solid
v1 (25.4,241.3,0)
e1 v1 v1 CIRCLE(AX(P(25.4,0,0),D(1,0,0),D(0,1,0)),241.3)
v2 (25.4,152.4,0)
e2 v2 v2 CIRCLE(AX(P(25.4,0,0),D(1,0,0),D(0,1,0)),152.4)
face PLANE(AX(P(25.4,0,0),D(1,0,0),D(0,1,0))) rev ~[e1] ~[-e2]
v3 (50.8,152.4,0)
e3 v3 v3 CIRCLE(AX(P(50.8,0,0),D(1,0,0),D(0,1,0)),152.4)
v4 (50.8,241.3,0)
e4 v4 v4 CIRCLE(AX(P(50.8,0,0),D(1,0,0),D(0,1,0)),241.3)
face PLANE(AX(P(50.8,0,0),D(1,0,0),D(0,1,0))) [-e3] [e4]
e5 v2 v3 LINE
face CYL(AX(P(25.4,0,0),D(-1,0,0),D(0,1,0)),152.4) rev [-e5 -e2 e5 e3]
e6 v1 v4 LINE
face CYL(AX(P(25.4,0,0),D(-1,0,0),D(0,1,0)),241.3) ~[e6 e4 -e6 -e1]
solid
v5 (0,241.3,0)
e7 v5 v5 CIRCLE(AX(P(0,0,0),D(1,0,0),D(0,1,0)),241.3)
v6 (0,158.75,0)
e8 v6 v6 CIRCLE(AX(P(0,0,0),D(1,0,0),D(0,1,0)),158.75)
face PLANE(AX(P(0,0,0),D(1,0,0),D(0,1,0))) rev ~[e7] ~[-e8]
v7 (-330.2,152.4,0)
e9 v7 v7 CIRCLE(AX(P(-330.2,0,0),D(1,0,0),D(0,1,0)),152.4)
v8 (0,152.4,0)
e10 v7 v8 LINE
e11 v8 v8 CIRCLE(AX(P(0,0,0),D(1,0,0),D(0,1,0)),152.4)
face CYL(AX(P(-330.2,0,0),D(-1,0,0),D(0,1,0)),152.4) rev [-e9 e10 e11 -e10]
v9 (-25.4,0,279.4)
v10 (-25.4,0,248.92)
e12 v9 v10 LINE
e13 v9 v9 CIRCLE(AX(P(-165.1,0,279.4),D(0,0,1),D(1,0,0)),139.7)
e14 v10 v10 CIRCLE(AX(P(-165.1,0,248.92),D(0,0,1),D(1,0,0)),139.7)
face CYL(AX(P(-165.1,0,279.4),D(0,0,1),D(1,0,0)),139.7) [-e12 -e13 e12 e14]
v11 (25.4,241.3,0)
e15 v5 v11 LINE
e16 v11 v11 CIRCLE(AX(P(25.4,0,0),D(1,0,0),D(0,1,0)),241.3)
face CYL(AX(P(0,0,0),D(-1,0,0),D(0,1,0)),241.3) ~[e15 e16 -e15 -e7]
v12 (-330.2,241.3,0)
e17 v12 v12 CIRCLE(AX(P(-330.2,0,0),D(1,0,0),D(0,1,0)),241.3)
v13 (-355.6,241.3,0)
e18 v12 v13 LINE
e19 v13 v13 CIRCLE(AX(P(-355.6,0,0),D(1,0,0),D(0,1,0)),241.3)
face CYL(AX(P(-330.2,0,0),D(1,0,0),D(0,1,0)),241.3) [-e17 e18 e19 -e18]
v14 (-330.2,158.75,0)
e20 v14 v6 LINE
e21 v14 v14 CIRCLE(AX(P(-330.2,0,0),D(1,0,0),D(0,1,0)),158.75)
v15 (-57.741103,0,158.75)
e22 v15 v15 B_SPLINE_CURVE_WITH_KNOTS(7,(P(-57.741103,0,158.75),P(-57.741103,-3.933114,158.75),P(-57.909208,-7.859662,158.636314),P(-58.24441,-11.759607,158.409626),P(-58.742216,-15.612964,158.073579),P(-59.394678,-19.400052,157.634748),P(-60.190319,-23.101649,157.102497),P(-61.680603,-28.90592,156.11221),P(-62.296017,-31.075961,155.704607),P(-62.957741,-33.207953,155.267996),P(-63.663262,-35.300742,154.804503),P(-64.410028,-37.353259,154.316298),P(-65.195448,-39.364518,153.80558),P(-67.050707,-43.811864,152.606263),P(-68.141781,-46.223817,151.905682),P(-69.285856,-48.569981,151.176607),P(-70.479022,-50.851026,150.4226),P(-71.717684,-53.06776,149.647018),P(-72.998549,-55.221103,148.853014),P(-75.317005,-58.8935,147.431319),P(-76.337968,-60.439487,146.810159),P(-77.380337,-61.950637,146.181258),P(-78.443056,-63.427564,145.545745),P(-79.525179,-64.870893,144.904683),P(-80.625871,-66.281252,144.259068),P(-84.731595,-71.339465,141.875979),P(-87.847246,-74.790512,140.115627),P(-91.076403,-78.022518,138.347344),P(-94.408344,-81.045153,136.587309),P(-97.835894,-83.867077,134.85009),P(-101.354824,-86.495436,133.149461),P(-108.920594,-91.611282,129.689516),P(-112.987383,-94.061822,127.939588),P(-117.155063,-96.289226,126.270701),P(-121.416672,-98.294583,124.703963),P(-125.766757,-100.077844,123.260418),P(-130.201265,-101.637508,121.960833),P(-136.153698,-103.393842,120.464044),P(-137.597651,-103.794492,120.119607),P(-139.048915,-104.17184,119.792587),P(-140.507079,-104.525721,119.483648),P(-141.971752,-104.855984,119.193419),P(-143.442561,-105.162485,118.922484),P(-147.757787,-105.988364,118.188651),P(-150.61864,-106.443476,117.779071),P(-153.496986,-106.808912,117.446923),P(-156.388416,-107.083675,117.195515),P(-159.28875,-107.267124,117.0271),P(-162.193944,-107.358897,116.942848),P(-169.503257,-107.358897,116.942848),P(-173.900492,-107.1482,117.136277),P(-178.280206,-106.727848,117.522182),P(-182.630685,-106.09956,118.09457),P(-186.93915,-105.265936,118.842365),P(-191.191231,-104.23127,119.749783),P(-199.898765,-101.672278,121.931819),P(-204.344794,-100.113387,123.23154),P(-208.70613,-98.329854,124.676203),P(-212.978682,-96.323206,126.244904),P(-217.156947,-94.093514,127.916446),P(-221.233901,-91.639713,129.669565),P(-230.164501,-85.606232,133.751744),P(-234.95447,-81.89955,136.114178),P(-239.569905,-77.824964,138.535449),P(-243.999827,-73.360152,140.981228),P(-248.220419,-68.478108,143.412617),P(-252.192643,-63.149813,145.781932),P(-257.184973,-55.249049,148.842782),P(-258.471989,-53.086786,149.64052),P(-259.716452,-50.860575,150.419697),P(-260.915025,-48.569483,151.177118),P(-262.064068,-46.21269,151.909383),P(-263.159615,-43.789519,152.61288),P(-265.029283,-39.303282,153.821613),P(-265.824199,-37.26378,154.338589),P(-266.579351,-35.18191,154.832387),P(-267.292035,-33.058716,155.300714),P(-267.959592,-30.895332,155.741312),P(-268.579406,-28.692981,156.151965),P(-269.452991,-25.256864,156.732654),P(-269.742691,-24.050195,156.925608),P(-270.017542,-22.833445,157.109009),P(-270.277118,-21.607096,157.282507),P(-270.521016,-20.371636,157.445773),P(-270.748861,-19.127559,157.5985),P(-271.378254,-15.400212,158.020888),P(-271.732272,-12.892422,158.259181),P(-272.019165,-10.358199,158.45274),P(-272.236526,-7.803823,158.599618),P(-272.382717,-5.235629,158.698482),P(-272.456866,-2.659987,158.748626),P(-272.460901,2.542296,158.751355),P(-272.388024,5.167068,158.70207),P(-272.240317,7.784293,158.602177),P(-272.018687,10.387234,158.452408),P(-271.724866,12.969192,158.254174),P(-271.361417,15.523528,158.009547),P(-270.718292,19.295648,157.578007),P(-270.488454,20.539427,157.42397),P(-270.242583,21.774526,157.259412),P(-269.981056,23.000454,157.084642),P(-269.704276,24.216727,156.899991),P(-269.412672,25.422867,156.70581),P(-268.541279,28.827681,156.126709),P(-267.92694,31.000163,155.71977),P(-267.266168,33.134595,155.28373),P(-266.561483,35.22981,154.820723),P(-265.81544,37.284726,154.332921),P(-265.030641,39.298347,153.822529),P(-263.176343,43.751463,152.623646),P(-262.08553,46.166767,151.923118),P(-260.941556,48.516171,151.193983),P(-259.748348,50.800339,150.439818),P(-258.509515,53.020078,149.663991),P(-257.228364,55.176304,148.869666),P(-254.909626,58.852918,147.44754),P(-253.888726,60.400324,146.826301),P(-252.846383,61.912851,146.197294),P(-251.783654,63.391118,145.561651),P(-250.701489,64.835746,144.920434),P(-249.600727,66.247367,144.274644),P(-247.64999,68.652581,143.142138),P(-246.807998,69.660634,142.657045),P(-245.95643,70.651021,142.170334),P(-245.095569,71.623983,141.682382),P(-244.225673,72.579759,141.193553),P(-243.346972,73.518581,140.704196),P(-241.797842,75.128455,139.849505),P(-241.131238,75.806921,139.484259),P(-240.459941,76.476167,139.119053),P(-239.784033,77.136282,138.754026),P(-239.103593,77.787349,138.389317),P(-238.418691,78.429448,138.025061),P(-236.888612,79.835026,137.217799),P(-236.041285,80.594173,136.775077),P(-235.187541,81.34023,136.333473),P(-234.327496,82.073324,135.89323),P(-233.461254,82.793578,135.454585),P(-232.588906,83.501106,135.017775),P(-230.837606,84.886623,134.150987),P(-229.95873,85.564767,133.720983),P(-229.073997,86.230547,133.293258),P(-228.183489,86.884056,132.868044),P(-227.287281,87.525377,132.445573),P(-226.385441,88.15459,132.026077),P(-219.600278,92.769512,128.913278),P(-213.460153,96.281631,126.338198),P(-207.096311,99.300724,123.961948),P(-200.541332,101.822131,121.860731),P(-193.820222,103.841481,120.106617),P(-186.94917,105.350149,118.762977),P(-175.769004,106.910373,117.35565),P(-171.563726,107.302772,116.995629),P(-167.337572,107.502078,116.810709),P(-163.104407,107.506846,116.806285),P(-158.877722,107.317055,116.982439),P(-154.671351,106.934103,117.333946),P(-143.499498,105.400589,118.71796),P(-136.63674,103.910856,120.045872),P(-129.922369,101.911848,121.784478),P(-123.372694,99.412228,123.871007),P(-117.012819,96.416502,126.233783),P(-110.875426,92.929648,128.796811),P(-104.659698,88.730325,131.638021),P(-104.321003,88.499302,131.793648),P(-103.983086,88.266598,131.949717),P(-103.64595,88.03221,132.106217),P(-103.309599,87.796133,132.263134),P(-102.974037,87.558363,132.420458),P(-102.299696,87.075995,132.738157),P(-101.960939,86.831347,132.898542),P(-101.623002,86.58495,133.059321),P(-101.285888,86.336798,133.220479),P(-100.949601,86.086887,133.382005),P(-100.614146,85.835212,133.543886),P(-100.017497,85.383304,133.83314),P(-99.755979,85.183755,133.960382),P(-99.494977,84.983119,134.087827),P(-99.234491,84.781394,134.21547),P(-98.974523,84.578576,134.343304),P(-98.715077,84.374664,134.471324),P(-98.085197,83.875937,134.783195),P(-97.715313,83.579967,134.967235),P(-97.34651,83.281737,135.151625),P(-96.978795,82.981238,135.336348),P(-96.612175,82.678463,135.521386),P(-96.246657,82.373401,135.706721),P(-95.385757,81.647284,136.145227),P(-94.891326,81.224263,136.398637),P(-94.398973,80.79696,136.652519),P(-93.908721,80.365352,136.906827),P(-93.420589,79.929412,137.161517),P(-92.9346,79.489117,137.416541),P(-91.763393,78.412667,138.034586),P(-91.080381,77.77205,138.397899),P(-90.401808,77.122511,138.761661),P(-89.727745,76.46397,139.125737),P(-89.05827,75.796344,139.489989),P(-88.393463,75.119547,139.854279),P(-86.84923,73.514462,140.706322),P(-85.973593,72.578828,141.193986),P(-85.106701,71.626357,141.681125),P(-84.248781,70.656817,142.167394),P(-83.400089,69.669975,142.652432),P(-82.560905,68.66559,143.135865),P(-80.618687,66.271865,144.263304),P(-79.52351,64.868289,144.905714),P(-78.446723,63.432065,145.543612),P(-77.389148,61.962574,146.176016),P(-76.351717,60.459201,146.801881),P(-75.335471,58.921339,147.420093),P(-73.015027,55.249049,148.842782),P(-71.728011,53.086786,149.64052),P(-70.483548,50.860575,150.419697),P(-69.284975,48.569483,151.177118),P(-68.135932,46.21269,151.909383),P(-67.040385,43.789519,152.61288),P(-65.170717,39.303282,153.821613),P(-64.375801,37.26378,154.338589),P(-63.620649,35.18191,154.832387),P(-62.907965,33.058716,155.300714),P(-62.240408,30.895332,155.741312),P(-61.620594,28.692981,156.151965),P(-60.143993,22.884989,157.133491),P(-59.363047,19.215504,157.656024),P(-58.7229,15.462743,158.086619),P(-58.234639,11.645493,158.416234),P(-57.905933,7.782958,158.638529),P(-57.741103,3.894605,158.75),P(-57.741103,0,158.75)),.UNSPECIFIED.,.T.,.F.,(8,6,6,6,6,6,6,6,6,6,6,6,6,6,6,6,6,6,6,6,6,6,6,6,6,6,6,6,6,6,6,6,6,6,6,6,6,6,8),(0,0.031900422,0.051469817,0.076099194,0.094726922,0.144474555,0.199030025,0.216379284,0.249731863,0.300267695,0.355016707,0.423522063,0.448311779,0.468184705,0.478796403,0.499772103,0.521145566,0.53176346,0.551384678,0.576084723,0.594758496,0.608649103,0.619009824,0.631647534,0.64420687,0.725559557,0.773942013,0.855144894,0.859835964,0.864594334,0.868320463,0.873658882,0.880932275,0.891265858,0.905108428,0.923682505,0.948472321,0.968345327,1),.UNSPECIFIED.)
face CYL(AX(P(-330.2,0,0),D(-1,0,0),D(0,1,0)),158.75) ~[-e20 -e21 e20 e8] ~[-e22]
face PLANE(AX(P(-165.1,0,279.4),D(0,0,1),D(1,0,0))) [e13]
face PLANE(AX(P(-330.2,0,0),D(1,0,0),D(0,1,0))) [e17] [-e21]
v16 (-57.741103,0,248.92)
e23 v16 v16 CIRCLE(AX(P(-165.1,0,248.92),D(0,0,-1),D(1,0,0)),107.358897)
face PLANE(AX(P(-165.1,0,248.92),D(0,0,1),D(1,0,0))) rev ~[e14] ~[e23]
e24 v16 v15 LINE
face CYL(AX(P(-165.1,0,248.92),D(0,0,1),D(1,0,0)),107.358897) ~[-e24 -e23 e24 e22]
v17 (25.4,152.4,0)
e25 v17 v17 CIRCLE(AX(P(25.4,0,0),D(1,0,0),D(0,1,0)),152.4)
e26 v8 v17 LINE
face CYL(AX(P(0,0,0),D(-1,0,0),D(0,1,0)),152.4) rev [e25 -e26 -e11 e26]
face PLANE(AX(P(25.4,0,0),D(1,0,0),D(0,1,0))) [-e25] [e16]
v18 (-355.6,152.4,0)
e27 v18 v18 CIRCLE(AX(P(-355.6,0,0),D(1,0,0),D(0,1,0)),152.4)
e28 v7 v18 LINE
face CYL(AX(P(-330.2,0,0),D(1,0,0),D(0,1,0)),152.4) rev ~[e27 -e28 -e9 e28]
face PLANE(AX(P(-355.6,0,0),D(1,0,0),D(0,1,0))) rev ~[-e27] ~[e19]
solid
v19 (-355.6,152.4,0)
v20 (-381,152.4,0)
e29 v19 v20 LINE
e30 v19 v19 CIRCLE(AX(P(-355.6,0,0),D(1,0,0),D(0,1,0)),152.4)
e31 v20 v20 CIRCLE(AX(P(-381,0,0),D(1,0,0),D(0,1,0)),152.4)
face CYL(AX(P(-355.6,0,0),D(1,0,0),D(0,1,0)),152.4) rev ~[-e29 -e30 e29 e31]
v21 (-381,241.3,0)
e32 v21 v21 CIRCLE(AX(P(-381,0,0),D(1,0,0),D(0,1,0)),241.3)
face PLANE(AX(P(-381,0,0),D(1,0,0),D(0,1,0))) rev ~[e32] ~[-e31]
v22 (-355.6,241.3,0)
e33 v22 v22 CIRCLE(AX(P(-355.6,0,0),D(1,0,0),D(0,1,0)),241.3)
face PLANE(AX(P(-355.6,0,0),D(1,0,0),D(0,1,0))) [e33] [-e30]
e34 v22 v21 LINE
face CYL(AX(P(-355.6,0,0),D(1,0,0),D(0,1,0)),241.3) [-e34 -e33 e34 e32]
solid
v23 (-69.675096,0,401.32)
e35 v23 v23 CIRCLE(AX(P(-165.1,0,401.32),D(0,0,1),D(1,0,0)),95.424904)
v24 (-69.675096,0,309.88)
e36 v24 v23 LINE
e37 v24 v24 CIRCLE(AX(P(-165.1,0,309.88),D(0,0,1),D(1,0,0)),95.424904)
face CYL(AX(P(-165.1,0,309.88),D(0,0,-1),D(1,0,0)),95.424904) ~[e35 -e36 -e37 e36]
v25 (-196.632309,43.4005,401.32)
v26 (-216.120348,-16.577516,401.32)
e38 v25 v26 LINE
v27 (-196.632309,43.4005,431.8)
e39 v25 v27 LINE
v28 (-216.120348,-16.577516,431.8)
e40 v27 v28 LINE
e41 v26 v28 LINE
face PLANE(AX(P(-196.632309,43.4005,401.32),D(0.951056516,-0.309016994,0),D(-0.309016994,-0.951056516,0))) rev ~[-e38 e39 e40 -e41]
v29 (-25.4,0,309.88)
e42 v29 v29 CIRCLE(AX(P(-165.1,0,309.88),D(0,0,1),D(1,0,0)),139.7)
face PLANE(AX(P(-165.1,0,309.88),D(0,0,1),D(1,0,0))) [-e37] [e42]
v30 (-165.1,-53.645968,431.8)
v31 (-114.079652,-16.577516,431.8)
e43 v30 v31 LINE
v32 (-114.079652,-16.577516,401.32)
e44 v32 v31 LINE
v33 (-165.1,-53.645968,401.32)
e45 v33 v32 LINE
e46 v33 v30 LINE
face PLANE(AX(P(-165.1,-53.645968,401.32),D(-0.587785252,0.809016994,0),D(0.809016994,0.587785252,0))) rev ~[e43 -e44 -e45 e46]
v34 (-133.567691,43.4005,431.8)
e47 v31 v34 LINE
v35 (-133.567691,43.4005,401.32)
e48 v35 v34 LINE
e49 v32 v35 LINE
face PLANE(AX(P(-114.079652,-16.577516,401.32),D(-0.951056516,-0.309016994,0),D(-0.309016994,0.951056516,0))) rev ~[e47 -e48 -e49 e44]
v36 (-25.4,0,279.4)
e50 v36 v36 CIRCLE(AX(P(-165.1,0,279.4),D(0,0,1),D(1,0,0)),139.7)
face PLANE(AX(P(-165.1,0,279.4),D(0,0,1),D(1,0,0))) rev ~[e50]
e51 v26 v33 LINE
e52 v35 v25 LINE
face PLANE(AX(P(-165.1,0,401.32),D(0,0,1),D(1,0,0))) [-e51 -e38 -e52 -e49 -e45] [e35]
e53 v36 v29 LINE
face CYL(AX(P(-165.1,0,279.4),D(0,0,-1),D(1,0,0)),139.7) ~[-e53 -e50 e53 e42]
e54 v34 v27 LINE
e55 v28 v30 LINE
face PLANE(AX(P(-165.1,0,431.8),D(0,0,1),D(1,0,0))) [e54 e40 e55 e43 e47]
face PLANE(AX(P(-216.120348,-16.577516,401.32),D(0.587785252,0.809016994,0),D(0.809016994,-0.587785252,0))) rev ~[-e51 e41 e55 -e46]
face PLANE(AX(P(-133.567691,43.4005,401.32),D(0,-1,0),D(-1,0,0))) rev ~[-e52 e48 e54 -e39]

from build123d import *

# Parameters (mm, degrees)
F0_R      = 241.3
F0_R_2    = 152.4
F1_DEPTH  = 25.4
F3_R      = 241.3
F3_R_2    = 152.4
F4_DEPTH  = 25.4
F6_DEPTH  = 25.4
F7_DEPTH  = 25.4
F9_R      = 158.75
F9_R_2    = 152.4
F10_DEPTH = 330.2
F12_R     = 139.7
F13_DEPTH = 30.48
F14_R     = 107.3588969204
F15_REACH = 793.8778161324
F16_DEPTH = 30.48
F17_R     = 95.4249040927
F18_DEPTH = 91.44
F20_DEPTH = 30.48


with BuildPart() as f1:
    # F0 (on Right) → F1 (new body)
    with BuildSketch(Plane.YZ):
        Circle(F0_R)
        Circle(F0_R_2, mode=Mode.SUBTRACT)
    extrude(amount=F1_DEPTH)


with BuildPart() as f4:
    # F3 (on offset) → F4 (new body)
    with BuildSketch(Plane.YZ.offset(-330.2)):
        Circle(F3_R)
        Circle(F3_R_2, mode=Mode.SUBTRACT)
    extrude(amount=-F4_DEPTH)


with BuildPart() as f6:
    # F6 (new): a face of the model
    f6_faces = [f4.part.faces().sort_by_distance(p)[0] for p in [
        (-355.6, -234.475005348, 0),
    ]]
    extrude(f6_faces, amount=F6_DEPTH)


with BuildPart() as f7:
    # F7 (new): a face of the model
    f7_faces = [f1.part.faces().sort_by_distance(p)[0] for p in [
        (25.4, -234.475005348, 0),
    ]]
    extrude(f7_faces, amount=F7_DEPTH)


with BuildPart() as f1_1:
    add(f1.part)

    add(f4.part)  # F10 merges F4
    # F9 (on face) → F10 (join, through all)
    with BuildSketch(Plane.YZ.offset(-330.2)):
        Circle(F9_R)
        Circle(F9_R_2, mode=Mode.SUBTRACT)
    extrude(amount=F10_DEPTH)



with BuildPart() as f13:
    # F12 (on offset) → F13 (new body)
    with BuildSketch(Plane.XY.offset(279.4)):
        with Locations((-165.1, 0)):
            Circle(F12_R)
    extrude(amount=-F13_DEPTH)


with BuildPart() as f1_2:
    add(f1_1.part)

    add(f13.part)  # F15 merges F13
    f15_end = f1_2.faces().sort_by_distance((-165.1, -158.75, 0))[0]
    # F14 (on face) → F15 (join, up to a face of the model that its end follows)
    with BuildSketch(Plane(origin=(0, 0, 248.92), x_dir=(1, 0, 0), z_dir=(0, 0, -1))):
        with Locations((-165.1, 0)):
            Circle(F14_R)
    f15_long = extrude(amount=F15_REACH, mode=Mode.PRIVATE)
    add(split(f15_long, bisect_by=f15_end, keep=Keep.ALL, mode=Mode.PRIVATE).solids().sort_by_distance((-165.1, 0, 248.92))[0])


with BuildPart() as f16:
    # F16 (new): a face of the model
    f16_faces = [f1_2.part.faces().sort_by_distance(p)[0] for p in [
        (-165.1, 0, 279.4),
    ]]
    extrude(f16_faces, amount=F16_DEPTH)

    # F17 (on face) → F18 (join)
    with BuildSketch(Plane.XY.offset(309.88)):
        with Locations((-165.1, 0)):
            Circle(F17_R)
    extrude(amount=F18_DEPTH)

    # F19 (on face) → F20 (join)
    with BuildSketch(Plane.XY.offset(401.32)):
        Polygon((-133.5676910353, 43.4004999697), (-196.6323089647, 43.4004999697), (-216.1203476486, -16.5775158597), (-165.1, -53.6459682201), (-114.0796523514, -16.5775158597), align=None)
    extrude(amount=F20_DEPTH)


solid = Compound([f6.part, f7.part, f1_2.part, f16.part])
